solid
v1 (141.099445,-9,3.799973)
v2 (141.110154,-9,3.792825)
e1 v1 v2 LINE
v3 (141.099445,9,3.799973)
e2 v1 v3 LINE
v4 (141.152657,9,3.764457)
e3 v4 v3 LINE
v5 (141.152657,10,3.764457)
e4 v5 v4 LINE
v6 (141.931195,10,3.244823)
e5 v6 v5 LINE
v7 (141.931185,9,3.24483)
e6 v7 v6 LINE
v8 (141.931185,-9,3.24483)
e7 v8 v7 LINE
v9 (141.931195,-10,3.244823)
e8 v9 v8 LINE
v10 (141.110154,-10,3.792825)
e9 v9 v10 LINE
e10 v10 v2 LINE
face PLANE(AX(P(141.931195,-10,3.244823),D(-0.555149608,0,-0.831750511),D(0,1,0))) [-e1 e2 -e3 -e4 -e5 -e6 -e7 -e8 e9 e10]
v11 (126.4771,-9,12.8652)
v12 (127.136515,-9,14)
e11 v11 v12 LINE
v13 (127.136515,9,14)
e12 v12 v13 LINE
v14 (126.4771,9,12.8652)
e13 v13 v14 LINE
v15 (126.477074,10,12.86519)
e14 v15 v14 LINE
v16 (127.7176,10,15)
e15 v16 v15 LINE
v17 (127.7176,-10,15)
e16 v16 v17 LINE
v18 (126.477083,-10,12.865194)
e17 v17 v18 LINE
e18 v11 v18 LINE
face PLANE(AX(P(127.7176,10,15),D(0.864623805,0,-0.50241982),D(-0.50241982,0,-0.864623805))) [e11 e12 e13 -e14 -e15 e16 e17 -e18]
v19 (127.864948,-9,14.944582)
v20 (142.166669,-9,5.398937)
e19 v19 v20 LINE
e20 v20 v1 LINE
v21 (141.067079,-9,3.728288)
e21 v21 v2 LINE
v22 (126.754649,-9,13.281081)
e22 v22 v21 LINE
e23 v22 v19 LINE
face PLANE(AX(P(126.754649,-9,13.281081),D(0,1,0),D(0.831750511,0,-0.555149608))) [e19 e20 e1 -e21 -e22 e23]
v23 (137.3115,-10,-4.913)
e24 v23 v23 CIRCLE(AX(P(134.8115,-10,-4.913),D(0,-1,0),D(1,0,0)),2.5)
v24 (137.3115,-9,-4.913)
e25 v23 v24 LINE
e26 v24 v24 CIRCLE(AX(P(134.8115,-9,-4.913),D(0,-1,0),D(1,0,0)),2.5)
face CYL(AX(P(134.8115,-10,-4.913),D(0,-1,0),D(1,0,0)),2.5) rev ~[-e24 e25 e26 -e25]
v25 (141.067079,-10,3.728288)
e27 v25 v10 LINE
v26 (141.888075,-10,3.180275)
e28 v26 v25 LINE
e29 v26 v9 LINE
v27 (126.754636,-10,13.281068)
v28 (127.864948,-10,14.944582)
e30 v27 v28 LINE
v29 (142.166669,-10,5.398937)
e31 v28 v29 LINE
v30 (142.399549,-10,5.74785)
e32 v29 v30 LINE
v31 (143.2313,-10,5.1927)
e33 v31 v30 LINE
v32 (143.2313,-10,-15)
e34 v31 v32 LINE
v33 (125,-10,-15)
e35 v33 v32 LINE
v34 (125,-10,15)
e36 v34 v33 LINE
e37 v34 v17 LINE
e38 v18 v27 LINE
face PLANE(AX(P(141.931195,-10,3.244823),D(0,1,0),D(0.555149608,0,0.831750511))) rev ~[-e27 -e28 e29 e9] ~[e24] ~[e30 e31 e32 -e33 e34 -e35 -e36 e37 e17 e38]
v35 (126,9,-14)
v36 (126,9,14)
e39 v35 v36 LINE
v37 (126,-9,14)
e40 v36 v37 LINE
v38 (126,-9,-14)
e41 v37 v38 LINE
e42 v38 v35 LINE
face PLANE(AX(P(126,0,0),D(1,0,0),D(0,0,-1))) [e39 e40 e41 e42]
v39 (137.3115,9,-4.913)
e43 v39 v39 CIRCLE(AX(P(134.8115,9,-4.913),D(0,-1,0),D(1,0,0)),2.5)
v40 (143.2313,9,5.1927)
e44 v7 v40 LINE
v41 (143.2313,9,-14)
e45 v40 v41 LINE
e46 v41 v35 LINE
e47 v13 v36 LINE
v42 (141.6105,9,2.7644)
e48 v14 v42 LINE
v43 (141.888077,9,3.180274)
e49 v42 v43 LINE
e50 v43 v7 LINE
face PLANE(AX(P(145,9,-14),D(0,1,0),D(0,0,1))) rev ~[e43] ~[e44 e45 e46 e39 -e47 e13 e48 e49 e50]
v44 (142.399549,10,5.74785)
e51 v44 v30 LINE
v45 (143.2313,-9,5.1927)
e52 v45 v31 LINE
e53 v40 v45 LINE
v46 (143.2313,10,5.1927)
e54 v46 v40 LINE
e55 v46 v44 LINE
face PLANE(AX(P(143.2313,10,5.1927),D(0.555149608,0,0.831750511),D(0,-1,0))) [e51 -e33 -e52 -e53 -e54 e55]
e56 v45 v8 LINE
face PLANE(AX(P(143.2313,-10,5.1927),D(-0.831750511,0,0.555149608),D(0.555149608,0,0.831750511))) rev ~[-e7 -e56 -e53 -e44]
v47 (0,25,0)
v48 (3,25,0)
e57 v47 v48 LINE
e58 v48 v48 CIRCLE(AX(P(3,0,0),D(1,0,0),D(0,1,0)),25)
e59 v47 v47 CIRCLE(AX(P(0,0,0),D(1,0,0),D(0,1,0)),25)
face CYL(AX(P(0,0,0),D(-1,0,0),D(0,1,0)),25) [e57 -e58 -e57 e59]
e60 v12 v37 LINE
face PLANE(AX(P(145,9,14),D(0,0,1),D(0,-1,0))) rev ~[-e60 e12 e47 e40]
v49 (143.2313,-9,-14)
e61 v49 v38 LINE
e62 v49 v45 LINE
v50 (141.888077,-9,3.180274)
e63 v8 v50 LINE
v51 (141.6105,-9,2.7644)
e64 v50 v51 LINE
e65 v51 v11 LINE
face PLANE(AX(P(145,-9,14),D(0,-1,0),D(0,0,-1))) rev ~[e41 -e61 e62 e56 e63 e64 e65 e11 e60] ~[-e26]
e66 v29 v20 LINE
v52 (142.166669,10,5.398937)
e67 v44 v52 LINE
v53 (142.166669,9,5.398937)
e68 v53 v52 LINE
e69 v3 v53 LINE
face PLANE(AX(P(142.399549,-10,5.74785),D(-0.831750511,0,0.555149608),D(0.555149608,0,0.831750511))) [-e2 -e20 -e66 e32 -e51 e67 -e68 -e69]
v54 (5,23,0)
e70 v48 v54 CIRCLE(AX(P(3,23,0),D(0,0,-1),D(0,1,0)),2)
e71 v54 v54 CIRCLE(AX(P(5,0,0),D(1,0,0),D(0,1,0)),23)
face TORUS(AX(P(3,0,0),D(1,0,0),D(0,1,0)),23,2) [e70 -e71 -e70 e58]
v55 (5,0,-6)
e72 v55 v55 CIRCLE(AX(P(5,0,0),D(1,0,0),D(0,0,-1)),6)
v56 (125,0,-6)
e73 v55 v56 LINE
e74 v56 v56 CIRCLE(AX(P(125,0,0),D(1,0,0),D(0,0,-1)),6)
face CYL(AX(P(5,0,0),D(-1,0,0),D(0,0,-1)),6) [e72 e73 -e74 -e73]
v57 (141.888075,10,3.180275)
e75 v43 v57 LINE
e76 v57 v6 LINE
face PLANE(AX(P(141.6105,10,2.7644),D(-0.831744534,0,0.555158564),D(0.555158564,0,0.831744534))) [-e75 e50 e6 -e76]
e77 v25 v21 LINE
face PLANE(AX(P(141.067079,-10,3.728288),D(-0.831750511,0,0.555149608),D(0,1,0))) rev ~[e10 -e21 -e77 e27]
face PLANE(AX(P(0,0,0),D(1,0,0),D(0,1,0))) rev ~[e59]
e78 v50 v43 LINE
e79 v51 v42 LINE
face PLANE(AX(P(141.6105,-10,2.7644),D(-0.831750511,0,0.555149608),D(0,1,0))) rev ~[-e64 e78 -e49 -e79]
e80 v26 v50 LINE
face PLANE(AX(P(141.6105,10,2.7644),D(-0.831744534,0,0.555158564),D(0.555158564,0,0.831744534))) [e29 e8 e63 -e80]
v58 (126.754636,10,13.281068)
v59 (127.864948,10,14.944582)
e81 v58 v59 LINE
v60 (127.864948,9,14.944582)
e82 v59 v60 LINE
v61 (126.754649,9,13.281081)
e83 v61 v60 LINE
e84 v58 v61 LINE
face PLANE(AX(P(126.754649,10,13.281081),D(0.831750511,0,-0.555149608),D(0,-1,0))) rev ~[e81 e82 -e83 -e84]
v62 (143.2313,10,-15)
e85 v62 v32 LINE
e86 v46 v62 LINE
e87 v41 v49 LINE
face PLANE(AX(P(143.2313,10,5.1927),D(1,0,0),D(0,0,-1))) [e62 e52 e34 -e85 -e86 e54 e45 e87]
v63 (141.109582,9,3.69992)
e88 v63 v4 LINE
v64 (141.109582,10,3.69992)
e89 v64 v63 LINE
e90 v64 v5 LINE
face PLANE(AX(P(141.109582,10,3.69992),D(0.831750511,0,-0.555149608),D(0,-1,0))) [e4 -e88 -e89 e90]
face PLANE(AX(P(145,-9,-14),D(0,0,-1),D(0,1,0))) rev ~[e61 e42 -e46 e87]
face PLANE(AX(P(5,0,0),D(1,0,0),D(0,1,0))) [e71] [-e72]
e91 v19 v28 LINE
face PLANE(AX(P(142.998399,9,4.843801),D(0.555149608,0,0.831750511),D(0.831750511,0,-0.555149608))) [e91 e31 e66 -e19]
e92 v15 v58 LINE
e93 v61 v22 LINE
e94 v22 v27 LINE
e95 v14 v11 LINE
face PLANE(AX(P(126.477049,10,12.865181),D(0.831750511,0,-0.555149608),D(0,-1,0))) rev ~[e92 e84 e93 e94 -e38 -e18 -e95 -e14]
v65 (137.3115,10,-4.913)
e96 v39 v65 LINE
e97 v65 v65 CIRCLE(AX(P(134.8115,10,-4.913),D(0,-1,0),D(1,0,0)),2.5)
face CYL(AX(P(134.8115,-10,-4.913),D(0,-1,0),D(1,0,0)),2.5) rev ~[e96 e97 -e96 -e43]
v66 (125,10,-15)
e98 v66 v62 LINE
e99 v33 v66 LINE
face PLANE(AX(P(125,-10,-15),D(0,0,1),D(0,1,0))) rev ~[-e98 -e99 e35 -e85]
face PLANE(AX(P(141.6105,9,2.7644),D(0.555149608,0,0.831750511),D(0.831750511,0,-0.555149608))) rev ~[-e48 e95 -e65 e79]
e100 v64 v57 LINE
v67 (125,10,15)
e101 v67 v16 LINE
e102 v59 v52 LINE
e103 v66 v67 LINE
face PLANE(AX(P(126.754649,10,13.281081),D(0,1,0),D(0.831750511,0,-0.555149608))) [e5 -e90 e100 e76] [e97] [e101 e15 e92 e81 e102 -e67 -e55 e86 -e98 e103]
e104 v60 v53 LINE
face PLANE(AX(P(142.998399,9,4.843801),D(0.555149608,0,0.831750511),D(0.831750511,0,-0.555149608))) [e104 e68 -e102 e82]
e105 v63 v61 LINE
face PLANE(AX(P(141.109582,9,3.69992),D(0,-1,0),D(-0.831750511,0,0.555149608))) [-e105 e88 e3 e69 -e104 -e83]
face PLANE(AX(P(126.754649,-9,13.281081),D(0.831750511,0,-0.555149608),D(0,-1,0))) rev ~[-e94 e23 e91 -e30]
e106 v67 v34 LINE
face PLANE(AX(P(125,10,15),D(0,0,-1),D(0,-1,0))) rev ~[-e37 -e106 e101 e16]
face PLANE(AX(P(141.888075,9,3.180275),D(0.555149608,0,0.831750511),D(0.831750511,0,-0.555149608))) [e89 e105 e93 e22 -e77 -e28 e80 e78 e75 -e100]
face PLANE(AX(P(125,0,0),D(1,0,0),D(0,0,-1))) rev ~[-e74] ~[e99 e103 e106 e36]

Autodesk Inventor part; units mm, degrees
ref_plane "YZ Plane" through (0, 0, 0) normal (1, 0, 0) x (0, 1, 0)
ref_plane "XZ Plane" through (0, 0, 0) normal (0, 1, 0) x (-1, 0, 0)
ref_plane "XY Plane" through (0, 0, 0) normal (0, 0, 1) x (1, 0, 0)
sketch "Sketch1" plane through (0, 0, 0) normal (1, 0, 0) x (0, 1, 0)
  circle A0 centre (0, 0) radius 25
  dimension "d0" = 50
extrude "Extrusion1" add sketch "Sketch1" along normal blind 5
fillet "Fillet1" radius 2 1 edges at (5, -25, 0)
sketch "Sketch2" plane through (5, 0, 0) normal (1, 0, 0) x (0, 0, -1)
  circle A0 centre (0, 0) radius 6
  dimension "d4" = 12
extrude "Extrusion2" add sketch "Sketch2" along normal blind 120
sketch "Sketch3" plane through (125, 0, 0) normal (1, 0, 0) x (0, 0, -1)
  line L0 (15, 10) -> (-15, 10)
  line L1 (-15, 10) -> (-15, -10)
  line L2 (-15, -10) -> (15, -10)
  line L3 (15, -10) -> (15, 10)
  point P0 (0, 0)
  dimension "d7" = 20
  dimension "d8" = 30
  dimension "d9" = 15
  dimension "d10" = 10
extrude "Extrusion3" add sketch "Sketch3" along normal blind 20
sketch "Sketch4" plane through (145, 0, 0) normal (1, 0, 0) x (0, 0, -1)
  line L0 (-14, -9) -> (14, -9)
  line L1 (14, -9) -> (14, 9)
  line L2 (14, 9) -> (-14, 9)
  line L3 (-14, 9) -> (-14, -9)
  line L4 (-15, -10) -> (15, -10) projected
  line L5 (15, -10) -> (15, 10) projected
  point P0 (0, 0)
  dimension "d13" = 28
  dimension "d14" = 18
  dimension "d15" = 1
  dimension "d16" = 1
extrude "Extrusion4" cut sketch "Sketch4" against normal blind 19
sketch "Sketch5" plane through (125, 10, 15) normal (0, 1, 0) x (1, 0, 0)
  line L0 (0, 0) -> (20, 0) projected
  line L1 (2.7176, 0) -> (1.4771, 2.1348)
  line L2 (1.4771, 2.1348) -> (16.6105, 12.2356)
  line L3 (16.6105, 12.2356) -> (18.2313, 9.8073)
  line L4 (18.2313, 9.8073) -> (18.2313, 30)
  line L5 (0, 30) -> (20, 30) projected
  line L6 (20, 30) -> (20, 0) projected
  line L7 (20, 30) -> (20, 0)
  line L8 (20, 0) -> (2.7176, 0)
  point P0 (-125, 15)
extrude "Extrusion5" cut sketch "Sketch5" against normal blind 30
sketch "Sketch6" plane through (141.6105, 9, 2.7644) normal (0.5551496, 0, 0.8317505) x (0.8317505, 0, -0.5551496)
  line L0 (-18.1947, 1) -> (0, 1) projected
  line L1 (0, -19) -> (-18.1947, -19) projected
  line L2 (0, 1) -> (-18.1947, 1)
  line L3 (-18.1947, 1) -> (-18.1947, -19)
  line L4 (-18.1947, -19) -> (0, -19)
  line L5 (0, -19) -> (0, 1)
  point P0 (-116.25, -9)
extrude "Extrusion6" add sketch "Sketch6" along normal blind 0.5
sketch "Sketch7" plane through (125, -10, -15) normal (0, -1, 0) x (1, 0, 0)
  circle A0 centre (9.8115, 10.087) radius 2.5
  point P0 (-125, 15)
  dimension "d23" = 5
extrude "Extrusion7" cut sketch "Sketch7" against normal blind 25
sketch "Sketch8" plane through (143.2313, -10, 5.1927) normal (-0.8317505, 0, 0.5551496) x (0.5551496, 0, 0.8317505)
  line L0 (-16.7953, 0) -> (0, 0) projected
  line L1 (0, 20) -> (-16.7953, 20) projected
  line L2 (0, 0) -> (-2.3419, 0)
  line L3 (-2.3419, 0) -> (-2.3419, 20)
  line L4 (-2.3419, 20) -> (0, 20)
  line L5 (0, 20) -> (0, 0)
  point P0 (-83.8338, 10)
  point P1 (-2.3419, 0)
extrude "Extrusion8" add sketch "Sketch8" along normal blind 1
sketch "Sketch9" plane through (141.8881, 9, 3.1803) normal (0.5551496, 0, 0.8317505) x (0.8317505, 0, -0.5551496)
  line L0 (-18.1947, -19) -> (-18.3481, -19) projected
  line L1 (-18.1947, -18) -> (0, -18) projected
  line L2 (-18.1947, -19) -> (-0.9871, -19)
  line L3 (-0.9871, -19) -> (-0.9871, -18)
  line L4 (-0.9871, -18) -> (-18.1947, -18)
  line L5 (-18.1947, -18) -> (-18.1947, -19)
  point P0 (-116.25, -9)
  point P1 (-18.1947, -18)
extrude "Extrusion9" add sketch "Sketch9" along normal blind 2
sketch "Sketch10" plane through (141.8881, 9, 3.1803) normal (0.5551496, 0, 0.8317505) x (0.8317505, 0, -0.5551496)
  line L0 (-18.1947, 1) -> (-18.1947, -18) projected
  line L1 (1.107, 0) -> (-3.893, 0) projected
  line L2 (-18.1947, 1) -> (-0.936, 1)
  line L3 (-0.936, 1) -> (-0.936, 0)
  line L4 (-0.936, 0) -> (-18.1947, 0)
  line L5 (-18.1947, 0) -> (-18.1947, 1)
  point P0 (-116.25, -9)
  point P1 (-3.893, 0)
extrude "Extrusion10" add sketch "Sketch10" along normal blind 2
properties part number "reception robot design"
